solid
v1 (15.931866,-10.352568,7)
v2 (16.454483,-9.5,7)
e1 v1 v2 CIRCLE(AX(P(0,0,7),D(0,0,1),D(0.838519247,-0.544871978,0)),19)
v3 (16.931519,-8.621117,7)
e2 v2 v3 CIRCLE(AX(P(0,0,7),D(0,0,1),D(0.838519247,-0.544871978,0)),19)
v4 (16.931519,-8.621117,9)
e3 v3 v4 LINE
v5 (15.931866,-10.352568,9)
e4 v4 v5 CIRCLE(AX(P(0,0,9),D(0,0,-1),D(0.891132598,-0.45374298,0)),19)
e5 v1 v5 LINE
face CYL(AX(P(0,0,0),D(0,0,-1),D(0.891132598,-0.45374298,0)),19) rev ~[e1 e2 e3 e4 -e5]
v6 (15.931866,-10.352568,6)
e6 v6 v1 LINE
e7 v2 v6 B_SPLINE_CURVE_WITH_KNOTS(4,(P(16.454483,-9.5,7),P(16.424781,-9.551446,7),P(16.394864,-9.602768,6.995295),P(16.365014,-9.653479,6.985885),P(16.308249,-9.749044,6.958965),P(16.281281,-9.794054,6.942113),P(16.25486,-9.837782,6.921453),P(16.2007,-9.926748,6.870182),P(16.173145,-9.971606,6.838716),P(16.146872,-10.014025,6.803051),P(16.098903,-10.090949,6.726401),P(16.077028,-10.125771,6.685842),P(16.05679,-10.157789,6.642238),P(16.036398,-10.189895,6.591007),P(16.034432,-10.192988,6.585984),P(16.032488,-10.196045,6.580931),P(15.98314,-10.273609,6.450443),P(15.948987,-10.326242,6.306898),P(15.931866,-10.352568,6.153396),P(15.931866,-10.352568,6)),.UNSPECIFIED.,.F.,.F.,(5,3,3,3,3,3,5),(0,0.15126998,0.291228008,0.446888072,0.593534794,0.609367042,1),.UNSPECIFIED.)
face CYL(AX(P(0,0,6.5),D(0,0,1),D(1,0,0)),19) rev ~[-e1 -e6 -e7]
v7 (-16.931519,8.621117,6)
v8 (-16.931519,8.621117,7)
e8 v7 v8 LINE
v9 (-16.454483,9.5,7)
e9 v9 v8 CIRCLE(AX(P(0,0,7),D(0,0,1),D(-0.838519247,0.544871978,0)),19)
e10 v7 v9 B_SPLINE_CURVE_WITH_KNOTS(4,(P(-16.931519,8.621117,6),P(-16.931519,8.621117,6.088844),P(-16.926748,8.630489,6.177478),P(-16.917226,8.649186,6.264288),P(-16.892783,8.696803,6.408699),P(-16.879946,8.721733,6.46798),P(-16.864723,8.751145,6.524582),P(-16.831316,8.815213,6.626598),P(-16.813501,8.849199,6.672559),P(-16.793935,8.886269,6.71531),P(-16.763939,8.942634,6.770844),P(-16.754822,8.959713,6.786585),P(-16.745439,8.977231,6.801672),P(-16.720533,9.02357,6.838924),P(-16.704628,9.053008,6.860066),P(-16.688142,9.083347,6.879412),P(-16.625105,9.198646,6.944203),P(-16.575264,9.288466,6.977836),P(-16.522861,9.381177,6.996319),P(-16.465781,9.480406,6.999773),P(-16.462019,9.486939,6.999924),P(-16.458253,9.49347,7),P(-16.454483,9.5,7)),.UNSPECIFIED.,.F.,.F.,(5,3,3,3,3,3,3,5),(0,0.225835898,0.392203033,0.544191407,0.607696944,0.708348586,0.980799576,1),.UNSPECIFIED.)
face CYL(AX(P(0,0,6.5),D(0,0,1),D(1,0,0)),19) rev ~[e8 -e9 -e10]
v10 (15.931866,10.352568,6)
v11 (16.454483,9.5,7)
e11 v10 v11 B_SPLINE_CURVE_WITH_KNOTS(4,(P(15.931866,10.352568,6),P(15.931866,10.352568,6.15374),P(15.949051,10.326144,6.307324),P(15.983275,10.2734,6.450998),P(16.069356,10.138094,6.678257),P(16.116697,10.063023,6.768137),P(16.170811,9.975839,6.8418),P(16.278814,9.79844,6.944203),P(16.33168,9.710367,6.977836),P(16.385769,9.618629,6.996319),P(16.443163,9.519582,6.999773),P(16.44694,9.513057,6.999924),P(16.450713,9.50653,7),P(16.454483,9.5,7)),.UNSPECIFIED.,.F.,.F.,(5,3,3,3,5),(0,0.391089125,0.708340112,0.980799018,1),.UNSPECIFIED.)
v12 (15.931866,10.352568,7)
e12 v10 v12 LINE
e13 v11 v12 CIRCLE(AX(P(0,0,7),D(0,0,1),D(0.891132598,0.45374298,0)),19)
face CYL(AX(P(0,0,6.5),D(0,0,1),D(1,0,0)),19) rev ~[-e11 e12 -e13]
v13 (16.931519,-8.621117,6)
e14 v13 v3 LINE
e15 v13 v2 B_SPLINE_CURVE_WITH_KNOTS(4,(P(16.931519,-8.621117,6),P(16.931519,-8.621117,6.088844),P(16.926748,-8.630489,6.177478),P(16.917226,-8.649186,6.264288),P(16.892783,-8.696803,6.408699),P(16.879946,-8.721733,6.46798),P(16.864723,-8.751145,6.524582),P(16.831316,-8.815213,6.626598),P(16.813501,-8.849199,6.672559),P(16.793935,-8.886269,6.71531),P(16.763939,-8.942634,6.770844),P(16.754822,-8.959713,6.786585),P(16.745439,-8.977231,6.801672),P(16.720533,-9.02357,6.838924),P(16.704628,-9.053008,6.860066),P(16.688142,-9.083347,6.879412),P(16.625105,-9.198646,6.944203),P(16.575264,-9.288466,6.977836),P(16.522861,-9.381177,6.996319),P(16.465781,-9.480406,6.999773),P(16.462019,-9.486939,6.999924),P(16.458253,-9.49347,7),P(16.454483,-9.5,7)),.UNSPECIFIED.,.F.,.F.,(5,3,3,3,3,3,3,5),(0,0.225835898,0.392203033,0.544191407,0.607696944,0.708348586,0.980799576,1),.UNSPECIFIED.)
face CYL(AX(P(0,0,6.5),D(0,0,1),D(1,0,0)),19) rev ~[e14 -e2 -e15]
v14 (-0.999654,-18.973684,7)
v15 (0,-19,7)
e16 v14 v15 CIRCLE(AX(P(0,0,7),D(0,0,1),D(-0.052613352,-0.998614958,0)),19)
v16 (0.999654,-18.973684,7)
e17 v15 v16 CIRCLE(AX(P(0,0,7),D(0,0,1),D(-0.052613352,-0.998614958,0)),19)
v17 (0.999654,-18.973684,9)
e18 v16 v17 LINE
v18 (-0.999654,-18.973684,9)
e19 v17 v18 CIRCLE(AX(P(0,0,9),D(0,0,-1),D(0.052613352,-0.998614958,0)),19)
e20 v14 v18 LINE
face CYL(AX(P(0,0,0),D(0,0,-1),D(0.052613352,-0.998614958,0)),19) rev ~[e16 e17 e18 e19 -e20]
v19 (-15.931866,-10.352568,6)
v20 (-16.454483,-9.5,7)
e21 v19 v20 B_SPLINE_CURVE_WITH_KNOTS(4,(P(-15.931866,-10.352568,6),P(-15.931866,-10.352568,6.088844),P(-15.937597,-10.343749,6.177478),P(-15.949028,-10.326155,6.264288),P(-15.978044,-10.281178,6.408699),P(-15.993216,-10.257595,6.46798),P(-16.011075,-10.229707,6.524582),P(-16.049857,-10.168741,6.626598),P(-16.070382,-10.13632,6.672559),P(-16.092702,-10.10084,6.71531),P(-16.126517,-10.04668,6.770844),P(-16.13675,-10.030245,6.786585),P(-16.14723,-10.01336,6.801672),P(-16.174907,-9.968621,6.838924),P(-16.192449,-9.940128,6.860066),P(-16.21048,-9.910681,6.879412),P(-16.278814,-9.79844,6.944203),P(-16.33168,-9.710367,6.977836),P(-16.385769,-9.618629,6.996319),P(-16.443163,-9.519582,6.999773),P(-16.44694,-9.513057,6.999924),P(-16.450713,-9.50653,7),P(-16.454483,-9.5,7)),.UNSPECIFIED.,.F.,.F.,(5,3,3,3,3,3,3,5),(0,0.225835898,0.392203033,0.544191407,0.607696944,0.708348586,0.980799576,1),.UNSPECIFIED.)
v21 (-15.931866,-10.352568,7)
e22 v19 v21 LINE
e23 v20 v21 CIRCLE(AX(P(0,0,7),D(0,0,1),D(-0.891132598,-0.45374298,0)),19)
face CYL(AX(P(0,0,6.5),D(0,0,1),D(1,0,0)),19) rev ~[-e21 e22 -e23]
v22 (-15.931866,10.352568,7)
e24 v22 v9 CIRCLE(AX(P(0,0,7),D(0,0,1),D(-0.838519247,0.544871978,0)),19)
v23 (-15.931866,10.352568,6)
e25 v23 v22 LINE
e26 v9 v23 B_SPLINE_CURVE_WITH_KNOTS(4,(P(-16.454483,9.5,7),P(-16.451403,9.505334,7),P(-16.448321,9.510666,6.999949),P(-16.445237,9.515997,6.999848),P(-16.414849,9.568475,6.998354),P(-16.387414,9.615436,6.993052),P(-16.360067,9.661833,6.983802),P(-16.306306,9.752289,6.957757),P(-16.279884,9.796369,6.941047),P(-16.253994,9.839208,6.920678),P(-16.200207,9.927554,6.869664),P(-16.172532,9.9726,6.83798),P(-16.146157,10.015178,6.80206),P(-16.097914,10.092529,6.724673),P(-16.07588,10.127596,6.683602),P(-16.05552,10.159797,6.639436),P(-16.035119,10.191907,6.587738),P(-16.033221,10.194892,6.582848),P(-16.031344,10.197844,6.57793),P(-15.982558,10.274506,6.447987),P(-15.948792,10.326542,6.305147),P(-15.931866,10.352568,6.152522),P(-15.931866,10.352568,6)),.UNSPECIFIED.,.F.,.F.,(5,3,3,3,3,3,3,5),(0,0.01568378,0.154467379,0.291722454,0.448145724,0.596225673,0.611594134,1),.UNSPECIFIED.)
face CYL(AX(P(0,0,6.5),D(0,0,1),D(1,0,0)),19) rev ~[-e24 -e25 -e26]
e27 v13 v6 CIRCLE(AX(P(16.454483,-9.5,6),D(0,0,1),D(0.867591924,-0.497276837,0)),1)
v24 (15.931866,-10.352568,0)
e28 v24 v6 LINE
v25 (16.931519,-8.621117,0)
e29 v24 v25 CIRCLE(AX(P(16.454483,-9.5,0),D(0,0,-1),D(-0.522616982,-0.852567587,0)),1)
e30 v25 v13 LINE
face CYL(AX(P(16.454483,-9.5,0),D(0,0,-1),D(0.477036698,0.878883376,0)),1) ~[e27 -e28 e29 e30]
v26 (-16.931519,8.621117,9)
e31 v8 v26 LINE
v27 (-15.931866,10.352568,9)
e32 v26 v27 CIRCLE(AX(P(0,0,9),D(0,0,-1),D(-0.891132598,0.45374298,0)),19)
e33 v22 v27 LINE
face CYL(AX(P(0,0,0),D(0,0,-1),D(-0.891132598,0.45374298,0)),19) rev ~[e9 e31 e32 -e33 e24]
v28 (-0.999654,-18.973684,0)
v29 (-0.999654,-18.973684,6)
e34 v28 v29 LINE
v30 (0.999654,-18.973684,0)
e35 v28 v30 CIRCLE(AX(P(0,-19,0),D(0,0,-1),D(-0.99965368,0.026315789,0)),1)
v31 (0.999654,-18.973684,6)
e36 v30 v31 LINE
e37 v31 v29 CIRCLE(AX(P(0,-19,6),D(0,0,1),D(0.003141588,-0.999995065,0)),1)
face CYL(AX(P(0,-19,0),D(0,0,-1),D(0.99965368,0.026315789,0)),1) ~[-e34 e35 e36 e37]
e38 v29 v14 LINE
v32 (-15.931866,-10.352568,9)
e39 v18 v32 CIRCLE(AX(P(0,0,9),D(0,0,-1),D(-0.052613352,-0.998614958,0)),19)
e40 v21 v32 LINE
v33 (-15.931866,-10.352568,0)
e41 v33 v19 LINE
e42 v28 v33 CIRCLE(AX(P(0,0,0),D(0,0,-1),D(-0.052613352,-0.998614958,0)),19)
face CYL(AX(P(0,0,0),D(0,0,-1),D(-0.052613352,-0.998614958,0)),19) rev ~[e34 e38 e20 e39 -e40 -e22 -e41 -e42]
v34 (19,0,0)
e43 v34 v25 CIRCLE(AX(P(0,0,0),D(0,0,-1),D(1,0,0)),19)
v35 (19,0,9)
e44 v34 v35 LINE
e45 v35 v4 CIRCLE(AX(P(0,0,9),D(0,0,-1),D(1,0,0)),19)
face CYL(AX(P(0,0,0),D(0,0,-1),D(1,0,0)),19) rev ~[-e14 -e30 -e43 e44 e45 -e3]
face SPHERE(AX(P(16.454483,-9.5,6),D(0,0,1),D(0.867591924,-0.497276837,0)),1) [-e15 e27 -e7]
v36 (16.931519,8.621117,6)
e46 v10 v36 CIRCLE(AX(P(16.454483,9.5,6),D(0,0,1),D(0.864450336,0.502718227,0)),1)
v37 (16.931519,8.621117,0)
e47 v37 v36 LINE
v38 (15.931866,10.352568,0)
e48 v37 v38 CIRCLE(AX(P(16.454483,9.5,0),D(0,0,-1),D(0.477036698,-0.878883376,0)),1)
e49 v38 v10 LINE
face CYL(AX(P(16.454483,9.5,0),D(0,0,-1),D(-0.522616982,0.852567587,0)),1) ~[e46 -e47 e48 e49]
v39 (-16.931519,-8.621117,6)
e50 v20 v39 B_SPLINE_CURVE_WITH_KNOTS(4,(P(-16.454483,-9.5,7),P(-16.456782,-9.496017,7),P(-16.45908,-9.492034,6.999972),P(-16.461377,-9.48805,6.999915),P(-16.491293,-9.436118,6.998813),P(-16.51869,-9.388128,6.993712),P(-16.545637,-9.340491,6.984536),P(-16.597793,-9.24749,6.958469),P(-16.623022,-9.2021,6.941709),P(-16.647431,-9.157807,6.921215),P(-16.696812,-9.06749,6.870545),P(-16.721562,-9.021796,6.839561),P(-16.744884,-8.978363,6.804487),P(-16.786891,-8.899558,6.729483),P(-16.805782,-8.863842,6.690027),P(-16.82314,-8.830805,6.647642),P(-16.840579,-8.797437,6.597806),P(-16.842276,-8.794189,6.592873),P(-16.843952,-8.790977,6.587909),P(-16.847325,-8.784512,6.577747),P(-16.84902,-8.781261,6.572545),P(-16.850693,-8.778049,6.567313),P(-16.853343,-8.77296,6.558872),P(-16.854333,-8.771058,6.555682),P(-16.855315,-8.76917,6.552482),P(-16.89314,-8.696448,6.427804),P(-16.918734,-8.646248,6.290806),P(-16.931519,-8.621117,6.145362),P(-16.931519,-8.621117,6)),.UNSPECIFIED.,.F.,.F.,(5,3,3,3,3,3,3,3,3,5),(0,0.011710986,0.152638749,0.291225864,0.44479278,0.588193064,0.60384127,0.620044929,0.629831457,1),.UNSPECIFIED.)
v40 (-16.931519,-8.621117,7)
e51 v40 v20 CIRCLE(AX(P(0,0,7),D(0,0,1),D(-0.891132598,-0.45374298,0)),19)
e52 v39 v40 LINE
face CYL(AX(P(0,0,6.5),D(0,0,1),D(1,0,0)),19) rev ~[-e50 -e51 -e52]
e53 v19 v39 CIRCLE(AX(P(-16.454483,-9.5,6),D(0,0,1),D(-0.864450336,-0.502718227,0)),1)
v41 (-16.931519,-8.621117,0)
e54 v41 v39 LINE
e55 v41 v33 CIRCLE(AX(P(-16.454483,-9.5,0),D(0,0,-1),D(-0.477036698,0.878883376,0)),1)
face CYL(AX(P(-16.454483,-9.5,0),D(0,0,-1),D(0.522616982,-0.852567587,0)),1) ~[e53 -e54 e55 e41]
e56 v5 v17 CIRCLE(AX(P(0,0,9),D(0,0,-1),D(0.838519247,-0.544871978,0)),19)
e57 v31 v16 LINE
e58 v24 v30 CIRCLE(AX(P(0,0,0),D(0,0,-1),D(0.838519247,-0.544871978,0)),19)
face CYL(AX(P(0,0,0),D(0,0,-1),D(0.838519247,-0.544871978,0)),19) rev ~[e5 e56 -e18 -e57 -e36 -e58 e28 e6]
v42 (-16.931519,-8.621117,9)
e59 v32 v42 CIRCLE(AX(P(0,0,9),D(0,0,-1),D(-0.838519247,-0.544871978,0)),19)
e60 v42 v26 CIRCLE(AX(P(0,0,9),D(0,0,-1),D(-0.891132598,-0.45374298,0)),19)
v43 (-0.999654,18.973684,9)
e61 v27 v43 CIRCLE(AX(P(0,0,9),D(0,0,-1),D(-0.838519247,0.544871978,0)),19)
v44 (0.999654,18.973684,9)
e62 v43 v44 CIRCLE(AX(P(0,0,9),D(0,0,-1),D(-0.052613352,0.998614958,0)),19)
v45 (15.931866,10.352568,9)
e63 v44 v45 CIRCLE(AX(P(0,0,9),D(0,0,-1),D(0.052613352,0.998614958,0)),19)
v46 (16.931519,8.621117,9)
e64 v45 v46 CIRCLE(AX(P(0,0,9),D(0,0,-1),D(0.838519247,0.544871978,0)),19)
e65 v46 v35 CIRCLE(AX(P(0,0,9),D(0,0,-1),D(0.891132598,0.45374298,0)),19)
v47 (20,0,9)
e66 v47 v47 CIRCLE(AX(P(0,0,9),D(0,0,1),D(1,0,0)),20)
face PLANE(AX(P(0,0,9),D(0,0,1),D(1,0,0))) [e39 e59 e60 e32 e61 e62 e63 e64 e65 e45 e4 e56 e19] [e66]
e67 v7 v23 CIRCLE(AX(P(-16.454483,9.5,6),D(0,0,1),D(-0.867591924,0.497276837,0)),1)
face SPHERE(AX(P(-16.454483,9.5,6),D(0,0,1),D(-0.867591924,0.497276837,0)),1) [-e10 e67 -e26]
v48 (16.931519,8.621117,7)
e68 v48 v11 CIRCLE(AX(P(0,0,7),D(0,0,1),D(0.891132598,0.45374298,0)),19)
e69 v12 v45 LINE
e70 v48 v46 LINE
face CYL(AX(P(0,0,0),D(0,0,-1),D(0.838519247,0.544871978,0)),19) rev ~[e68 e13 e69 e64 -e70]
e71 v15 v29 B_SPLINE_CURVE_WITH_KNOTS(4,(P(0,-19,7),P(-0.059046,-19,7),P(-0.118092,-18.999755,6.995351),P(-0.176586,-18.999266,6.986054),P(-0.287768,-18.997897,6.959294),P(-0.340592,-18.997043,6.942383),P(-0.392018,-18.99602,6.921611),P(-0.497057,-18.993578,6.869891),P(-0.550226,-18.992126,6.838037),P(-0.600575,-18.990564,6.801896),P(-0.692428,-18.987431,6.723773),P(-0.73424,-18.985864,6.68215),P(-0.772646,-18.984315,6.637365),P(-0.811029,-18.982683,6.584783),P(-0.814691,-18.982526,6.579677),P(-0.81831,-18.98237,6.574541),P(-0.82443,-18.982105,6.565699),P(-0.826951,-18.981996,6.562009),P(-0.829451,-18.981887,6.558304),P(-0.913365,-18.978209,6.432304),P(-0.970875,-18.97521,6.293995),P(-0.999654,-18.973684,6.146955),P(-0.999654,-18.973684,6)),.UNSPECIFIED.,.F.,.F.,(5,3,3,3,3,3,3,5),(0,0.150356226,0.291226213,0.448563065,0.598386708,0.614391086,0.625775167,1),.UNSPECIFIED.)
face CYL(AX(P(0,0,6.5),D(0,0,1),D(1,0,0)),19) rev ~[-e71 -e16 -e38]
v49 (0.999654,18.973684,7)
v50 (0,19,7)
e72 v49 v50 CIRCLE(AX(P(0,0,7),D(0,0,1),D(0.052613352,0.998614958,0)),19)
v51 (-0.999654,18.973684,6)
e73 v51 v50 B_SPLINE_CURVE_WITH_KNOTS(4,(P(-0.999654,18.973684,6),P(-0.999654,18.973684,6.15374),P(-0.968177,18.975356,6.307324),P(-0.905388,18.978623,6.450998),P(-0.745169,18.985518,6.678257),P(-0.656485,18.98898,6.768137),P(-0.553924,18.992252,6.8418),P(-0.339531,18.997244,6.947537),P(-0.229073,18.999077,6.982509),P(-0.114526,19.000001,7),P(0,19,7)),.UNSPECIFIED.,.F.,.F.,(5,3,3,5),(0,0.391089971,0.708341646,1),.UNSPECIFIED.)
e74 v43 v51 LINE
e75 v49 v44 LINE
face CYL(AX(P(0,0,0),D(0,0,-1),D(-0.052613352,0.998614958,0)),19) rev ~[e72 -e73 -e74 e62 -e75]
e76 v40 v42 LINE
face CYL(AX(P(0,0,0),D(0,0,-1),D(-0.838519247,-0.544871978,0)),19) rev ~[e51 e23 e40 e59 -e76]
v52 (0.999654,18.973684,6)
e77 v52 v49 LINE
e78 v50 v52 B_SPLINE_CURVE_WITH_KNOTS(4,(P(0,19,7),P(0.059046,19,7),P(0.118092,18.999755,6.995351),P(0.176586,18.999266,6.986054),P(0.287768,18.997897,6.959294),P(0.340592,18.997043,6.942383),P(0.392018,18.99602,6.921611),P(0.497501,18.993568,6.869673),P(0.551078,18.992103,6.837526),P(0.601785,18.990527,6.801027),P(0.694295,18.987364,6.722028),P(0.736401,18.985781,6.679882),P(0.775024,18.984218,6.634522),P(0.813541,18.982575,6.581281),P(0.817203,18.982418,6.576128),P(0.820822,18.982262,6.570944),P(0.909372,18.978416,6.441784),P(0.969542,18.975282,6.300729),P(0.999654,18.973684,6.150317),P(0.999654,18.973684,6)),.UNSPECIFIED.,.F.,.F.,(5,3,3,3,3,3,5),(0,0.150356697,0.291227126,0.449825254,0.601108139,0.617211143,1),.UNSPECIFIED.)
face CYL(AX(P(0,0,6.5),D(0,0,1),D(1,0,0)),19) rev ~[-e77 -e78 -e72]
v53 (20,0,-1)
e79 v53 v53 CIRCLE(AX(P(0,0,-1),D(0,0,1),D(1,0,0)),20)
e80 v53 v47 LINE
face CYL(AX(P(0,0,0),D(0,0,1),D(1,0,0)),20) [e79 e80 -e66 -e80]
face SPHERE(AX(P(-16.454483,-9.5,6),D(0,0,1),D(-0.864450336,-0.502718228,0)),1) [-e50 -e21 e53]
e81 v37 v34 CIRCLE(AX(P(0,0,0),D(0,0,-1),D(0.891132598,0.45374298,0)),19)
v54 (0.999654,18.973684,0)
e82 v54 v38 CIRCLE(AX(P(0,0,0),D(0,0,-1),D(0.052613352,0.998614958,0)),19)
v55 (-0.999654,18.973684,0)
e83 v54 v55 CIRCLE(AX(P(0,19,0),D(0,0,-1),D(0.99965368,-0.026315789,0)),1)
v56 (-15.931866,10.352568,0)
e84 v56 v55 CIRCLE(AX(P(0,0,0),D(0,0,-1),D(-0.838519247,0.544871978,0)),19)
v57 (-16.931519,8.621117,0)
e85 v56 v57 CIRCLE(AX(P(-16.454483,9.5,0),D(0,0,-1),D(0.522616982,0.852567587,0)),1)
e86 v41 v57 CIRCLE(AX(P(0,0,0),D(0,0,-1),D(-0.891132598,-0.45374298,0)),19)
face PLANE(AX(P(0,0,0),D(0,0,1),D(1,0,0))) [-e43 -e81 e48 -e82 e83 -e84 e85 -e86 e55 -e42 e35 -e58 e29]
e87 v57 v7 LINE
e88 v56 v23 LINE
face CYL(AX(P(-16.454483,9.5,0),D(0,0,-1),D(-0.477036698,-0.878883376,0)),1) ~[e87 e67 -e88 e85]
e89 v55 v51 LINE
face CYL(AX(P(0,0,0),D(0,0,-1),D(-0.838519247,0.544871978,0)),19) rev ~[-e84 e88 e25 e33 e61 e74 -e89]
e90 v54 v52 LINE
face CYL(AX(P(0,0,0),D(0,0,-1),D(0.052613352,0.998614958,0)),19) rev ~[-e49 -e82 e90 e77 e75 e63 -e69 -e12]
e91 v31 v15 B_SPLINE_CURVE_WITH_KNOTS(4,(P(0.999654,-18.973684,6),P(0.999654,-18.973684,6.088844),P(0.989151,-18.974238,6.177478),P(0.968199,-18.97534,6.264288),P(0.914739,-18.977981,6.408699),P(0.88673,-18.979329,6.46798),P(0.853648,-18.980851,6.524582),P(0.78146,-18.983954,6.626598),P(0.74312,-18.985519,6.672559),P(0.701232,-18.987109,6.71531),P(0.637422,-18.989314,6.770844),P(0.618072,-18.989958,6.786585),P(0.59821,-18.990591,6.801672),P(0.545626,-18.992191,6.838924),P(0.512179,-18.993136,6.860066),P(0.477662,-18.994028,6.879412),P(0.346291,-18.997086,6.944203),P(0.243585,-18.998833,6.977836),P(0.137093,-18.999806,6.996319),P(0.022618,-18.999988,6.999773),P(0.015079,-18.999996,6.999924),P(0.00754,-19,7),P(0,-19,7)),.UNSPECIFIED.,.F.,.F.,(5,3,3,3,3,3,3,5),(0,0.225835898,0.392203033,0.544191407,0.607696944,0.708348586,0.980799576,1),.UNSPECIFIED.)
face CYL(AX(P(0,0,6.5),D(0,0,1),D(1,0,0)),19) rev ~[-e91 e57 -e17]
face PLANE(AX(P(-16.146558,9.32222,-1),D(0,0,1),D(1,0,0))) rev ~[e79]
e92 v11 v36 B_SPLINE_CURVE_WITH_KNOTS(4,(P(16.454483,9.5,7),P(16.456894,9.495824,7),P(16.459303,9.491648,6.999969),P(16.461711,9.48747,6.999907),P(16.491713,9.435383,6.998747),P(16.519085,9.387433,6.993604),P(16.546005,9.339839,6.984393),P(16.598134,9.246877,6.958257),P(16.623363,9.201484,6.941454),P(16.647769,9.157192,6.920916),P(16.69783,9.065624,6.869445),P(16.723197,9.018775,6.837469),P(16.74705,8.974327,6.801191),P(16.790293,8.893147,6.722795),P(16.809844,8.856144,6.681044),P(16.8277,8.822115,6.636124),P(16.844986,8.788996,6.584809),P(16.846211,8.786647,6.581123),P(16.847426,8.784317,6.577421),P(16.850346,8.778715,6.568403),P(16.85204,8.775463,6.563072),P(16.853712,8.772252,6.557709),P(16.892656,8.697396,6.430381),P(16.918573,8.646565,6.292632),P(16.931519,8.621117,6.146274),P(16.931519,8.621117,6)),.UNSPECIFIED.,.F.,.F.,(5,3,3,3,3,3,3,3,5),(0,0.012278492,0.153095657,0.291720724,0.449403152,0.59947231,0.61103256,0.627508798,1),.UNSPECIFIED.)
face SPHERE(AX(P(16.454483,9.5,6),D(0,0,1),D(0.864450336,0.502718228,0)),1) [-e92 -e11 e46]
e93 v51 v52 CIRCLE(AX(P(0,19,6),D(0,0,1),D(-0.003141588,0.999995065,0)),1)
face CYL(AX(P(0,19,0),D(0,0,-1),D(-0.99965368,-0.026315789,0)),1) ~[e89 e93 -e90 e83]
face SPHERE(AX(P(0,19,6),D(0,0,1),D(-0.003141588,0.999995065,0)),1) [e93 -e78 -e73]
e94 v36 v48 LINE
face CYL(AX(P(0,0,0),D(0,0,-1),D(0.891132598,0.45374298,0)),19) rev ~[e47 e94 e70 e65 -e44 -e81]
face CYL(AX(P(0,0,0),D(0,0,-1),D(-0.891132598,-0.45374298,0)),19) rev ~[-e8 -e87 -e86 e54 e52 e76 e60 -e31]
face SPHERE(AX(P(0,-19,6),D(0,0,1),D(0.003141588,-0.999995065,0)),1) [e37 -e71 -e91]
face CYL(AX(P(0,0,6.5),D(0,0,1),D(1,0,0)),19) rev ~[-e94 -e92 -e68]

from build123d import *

# Parameters (mm, degrees)
F0_R          = 20
F1_DEPTH      = 9
F2_DEPTH      = 1
F3_DEPTH      = 7
F3_DEPTH_BACK = 1
F4_T4_ANGLE   = 359.64
F4_S5_R       = 19
F4_T6_DEPTH   = 3
F4_T10_ANGLE  = 359.64
F4_S11_R      = 19
F4_T12_DEPTH  = 3
F4_T16_ANGLE  = 359.64
F4_S17_R      = 19
F4_T18_DEPTH  = 3
F4_T22_ANGLE  = 359.64
F4_S23_R      = 19
F4_T24_DEPTH  = 3
F4_T28_ANGLE  = 359.64
F4_S29_R      = 19
F4_T30_DEPTH  = 3
F4_T34_ANGLE  = 359.64
F4_S35_R      = 19
F4_T36_DEPTH  = 3


# Not quite as in the source:
# - a fillet or chamfer that OpenCascade refuses, or shapes differently, is made with other operations: its cross-section is extruded or revolved along the edge and cut away or added


with BuildPart() as f1:
    # F0 (on Top) → F1 (new body)
    with BuildSketch(Plane.XY):
        Circle(F0_R)
        with BuildLine():
            ThreePointArc((16.9315193695, 8.6211166237), (18.4756443463, 4.432895892), (19, 0))
            ThreePointArc((19, 0), (18.4756443463, -4.432895892), (16.9315193695, -8.6211166237))
            ThreePointArc((16.9315193695, -8.6211166237), (16.4544826719, -9.5), (15.9318656899, -10.3525675868))
            ThreePointArc((15.9318656899, -10.3525675868), (9.5, -16.4544826719), (0.9996536796, -18.9736842105))
            ThreePointArc((0.9996536796, -18.9736842105), (0, -19), (-0.9996536796, -18.9736842105))
            ThreePointArc((-0.9996536796, -18.9736842105), (-9.5, -16.4544826719), (-15.9318656899, -10.3525675868))
            ThreePointArc((-15.9318656899, -10.3525675868), (-16.4544826719, -9.5), (-16.9315193695, -8.6211166237))
            ThreePointArc((-16.9315193695, -8.6211166237), (-19, 0), (-16.9315193695, 8.6211166237))
            ThreePointArc((-16.9315193695, 8.6211166237), (-16.4544826719, 9.5), (-15.9318656899, 10.3525675868))
            ThreePointArc((-15.9318656899, 10.3525675868), (-9.5, 16.4544826719), (-0.9996536796, 18.9736842105))
            ThreePointArc((-0.9996536796, 18.9736842105), (0, 19), (0.9996536796, 18.9736842105))
            ThreePointArc((0.9996536796, 18.9736842105), (9.5, 16.4544826719), (15.9318656899, 10.3525675868))
            ThreePointArc((15.9318656899, 10.3525675868), (16.4544826719, 9.5), (16.9315193695, 8.6211166237))
        make_face(mode=Mode.SUBTRACT)
    extrude(amount=F1_DEPTH)

    # F0 (on Top) → F2 (join)
    with BuildSketch(Plane.XY):
        Circle(F0_R)
        with BuildLine():
            ThreePointArc((16.9315193695, 8.6211166237), (18.4756443463, 4.432895892), (19, 0))
            ThreePointArc((19, 0), (18.4756443463, -4.432895892), (16.9315193695, -8.6211166237))
            ThreePointArc((16.9315193695, -8.6211166237), (16.4544826719, -9.5), (15.9318656899, -10.3525675868))
            ThreePointArc((15.9318656899, -10.3525675868), (9.5, -16.4544826719), (0.9996536796, -18.9736842105))
            ThreePointArc((0.9996536796, -18.9736842105), (0, -19), (-0.9996536796, -18.9736842105))
            ThreePointArc((-0.9996536796, -18.9736842105), (-9.5, -16.4544826719), (-15.9318656899, -10.3525675868))
            ThreePointArc((-15.9318656899, -10.3525675868), (-16.4544826719, -9.5), (-16.9315193695, -8.6211166237))
            ThreePointArc((-16.9315193695, -8.6211166237), (-19, 0), (-16.9315193695, 8.6211166237))
            ThreePointArc((-16.9315193695, 8.6211166237), (-16.4544826719, 9.5), (-15.9318656899, 10.3525675868))
            ThreePointArc((-15.9318656899, 10.3525675868), (-9.5, 16.4544826719), (-0.9996536796, 18.9736842105))
            ThreePointArc((-0.9996536796, 18.9736842105), (0, 19), (0.9996536796, 18.9736842105))
            ThreePointArc((0.9996536796, 18.9736842105), (9.5, 16.4544826719), (15.9318656899, 10.3525675868))
            ThreePointArc((15.9318656899, 10.3525675868), (16.4544826719, 9.5), (16.9315193695, 8.6211166237))
        make_face(mode=Mode.SUBTRACT)
        with BuildLine():
            ThreePointArc((16.9315193695, -8.6211166237), (18.4756443463, -4.432895892), (19, 0))
            ThreePointArc((19, 0), (18.4756443463, 4.432895892), (16.9315193695, 8.6211166237))
            ThreePointArc((16.9315193695, 8.6211166237), (15.5884572681, 9), (15.9318656899, 10.3525675868))
            ThreePointArc((15.9318656899, 10.3525675868), (9.5, 16.4544826719), (0.9996536796, 18.9736842105))
            ThreePointArc((0.9996536796, 18.9736842105), (0, 18), (-0.9996536796, 18.9736842105))
            ThreePointArc((-0.9996536796, 18.9736842105), (-9.5, 16.4544826719), (-15.9318656899, 10.3525675868))
            ThreePointArc((-15.9318656899, 10.3525675868), (-15.5884572681, 9), (-16.9315193695, 8.6211166237))
            ThreePointArc((-16.9315193695, 8.6211166237), (-19, 0), (-16.9315193695, -8.6211166237))
            ThreePointArc((-16.9315193695, -8.6211166237), (-15.5884572681, -9), (-15.9318656899, -10.3525675868))
            ThreePointArc((-15.9318656899, -10.3525675868), (-9.5, -16.4544826719), (-0.9996536796, -18.9736842105))
            ThreePointArc((-0.9996536796, -18.9736842105), (0, -18), (0.9996536796, -18.9736842105))
            ThreePointArc((0.9996536796, -18.9736842105), (9.5, -16.4544826719), (15.9318656899, -10.3525675868))
            ThreePointArc((15.9318656899, -10.3525675868), (15.5884572681, -9), (16.9315193695, -8.6211166237))
        make_face()
    extrude(amount=-F2_DEPTH)

    # F0 (on Top) → F3 (join, two sides)
    with BuildSketch(Plane.XY) as f3_sk:
        with BuildLine():
            ThreePointArc((-16.9315193695, 8.6211166237), (-15.5884572681, 9), (-15.9318656899, 10.3525675868))
            ThreePointArc((-15.9318656899, 10.3525675868), (-16.4544826719, 9.5), (-16.9315193695, 8.6211166237))
        make_face()
        with BuildLine():
            ThreePointArc((-0.9996536796, 18.9736842105), (0, 18), (0.9996536796, 18.9736842105))
            ThreePointArc((0.9996536796, 18.9736842105), (0, 19), (-0.9996536796, 18.9736842105))
        make_face()
        with BuildLine():
            ThreePointArc((15.9318656899, 10.3525675868), (15.5884572681, 9), (16.9315193695, 8.6211166237))
            ThreePointArc((16.9315193695, 8.6211166237), (16.4544826719, 9.5), (15.9318656899, 10.3525675868))
        make_face()
        with BuildLine():
            ThreePointArc((15.9318656899, -10.3525675868), (16.4544826719, -9.5), (16.9315193695, -8.6211166237))
            ThreePointArc((16.9315193695, -8.6211166237), (15.5884572681, -9), (15.9318656899, -10.3525675868))
        make_face()
        with BuildLine():
            ThreePointArc((-0.9996536796, -18.9736842105), (0, -19), (0.9996536796, -18.9736842105))
            ThreePointArc((0.9996536796, -18.9736842105), (0, -18), (-0.9996536796, -18.9736842105))
        make_face()
        with BuildLine():
            ThreePointArc((-16.9315193695, -8.6211166237), (-16.4544826719, -9.5), (-15.9318656899, -10.3525675868))
            ThreePointArc((-15.9318656899, -10.3525675868), (-15.5884572681, -9), (-16.9315193695, -8.6211166237))
        make_face()
    extrude(amount=F3_DEPTH)
    extrude(f3_sk.sketch, amount=-F3_DEPTH_BACK)

    # F4: fillet of radius 1 on 6 edges, made by hand


with BuildPart() as f4_tool2:
    # F4_s3 → F4_t4 (revolve)
    with BuildSketch(Plane(origin=(0.0300073325, -0.0515991808, 0), x_dir=(0, 0, 1), z_dir=(0.5027182272, -0.8644503364, 0))):
        with BuildLine():
            ThreePointArc((6, -19.9999062388), (6.7071067812, -19.70701302), (7, -18.9999062388))
            Line((7, -18.9999062388), (7, -19.9999062388))
            Line((7, -19.9999062388), (6, -19.9999062388))
        make_face()
    revolve(axis=Axis((16.4544826719, 9.5, 7), (0, 0, 1)), revolution_arc=F4_T4_ANGLE)

    # F4_s5 → F4_t6 (intersect, symmetric)
    with BuildSketch(Plane.XY.offset(6.5)):
        Circle(F4_S5_R)
    extrude(amount=F4_T6_DEPTH, both=True, mode=Mode.INTERSECT)


with BuildPart() as f1_1:
    add(f1.part)

    # F4_t1: cut F4_tool2
    add(f4_tool2.part, mode=Mode.SUBTRACT)


with BuildPart() as f4_tool8:
    # F4_s9 → F4_t10 (revolve)
    with BuildSketch(Plane(origin=(-0.0296825351, -0.0517867027, 0), x_dir=(0, 0, 1), z_dir=(-0.497276838, -0.8675919239, 0))):
        with BuildLine():
            ThreePointArc((6, -19.9999062388), (6.7071067812, -19.70701302), (7, -18.9999062388))
            Line((7, -18.9999062388), (7, -19.9999062388))
            Line((7, -19.9999062388), (6, -19.9999062388))
        make_face()
    revolve(axis=Axis((16.4544826719, -9.5, 7), (0, 0, 1)), revolution_arc=F4_T10_ANGLE)

    # F4_s11 → F4_t12 (intersect, symmetric)
    with BuildSketch(Plane.XY.offset(6.5)):
        Circle(F4_S11_R)
    extrude(amount=F4_T12_DEPTH, both=True, mode=Mode.INTERSECT)


with BuildPart() as f1_2:
    add(f1_1.part)

    # F4_t7: cut F4_tool8
    add(f4_tool8.part, mode=Mode.SUBTRACT)


with BuildPart() as f4_tool14:
    # F4_s15 → F4_t16 (revolve)
    with BuildSketch(Plane(origin=(-0.0596898677, -0.0001875219, 0), x_dir=(0, 0, 1), z_dir=(-0.9999950652, -0.0031415875, 0))):
        with BuildLine():
            ThreePointArc((6, -19.9999062388), (6.7071067812, -19.70701302), (7, -18.9999062388))
            Line((7, -18.9999062388), (7, -19.9999062388))
            Line((7, -19.9999062388), (6, -19.9999062388))
        make_face()
    revolve(axis=Axis((0, -19, 7), (0, 0, 1)), revolution_arc=F4_T16_ANGLE)

    # F4_s17 → F4_t18 (intersect, symmetric)
    with BuildSketch(Plane.XY.offset(6.5)):
        Circle(F4_S17_R)
    extrude(amount=F4_T18_DEPTH, both=True, mode=Mode.INTERSECT)


with BuildPart() as f1_3:
    add(f1_2.part)

    # F4_t13: cut F4_tool14
    add(f4_tool14.part, mode=Mode.SUBTRACT)


with BuildPart() as f4_tool20:
    # F4_s21 → F4_t22 (revolve)
    with BuildSketch(Plane(origin=(-0.0300073325, 0.0515991808, 0), x_dir=(0, 0, 1), z_dir=(-0.5027182272, 0.8644503364, 0))):
        with BuildLine():
            ThreePointArc((6, -19.9999062388), (6.7071067812, -19.70701302), (7, -18.9999062388))
            Line((7, -18.9999062388), (7, -19.9999062388))
            Line((7, -19.9999062388), (6, -19.9999062388))
        make_face()
    revolve(axis=Axis((-16.4544826719, -9.5, 7), (0, 0, 1)), revolution_arc=F4_T22_ANGLE)

    # F4_s23 → F4_t24 (intersect, symmetric)
    with BuildSketch(Plane.XY.offset(6.5)):
        Circle(F4_S23_R)
    extrude(amount=F4_T24_DEPTH, both=True, mode=Mode.INTERSECT)


with BuildPart() as f1_4:
    add(f1_3.part)

    # F4_t19: cut F4_tool20
    add(f4_tool20.part, mode=Mode.SUBTRACT)


with BuildPart() as f4_tool26:
    # F4_s27 → F4_t28 (revolve)
    with BuildSketch(Plane(origin=(0.0296825351, 0.0517867027, 0), x_dir=(0, 0, 1), z_dir=(0.497276838, 0.8675919239, 0))):
        with BuildLine():
            ThreePointArc((6, -19.9999062388), (6.7071067812, -19.70701302), (7, -18.9999062388))
            Line((7, -18.9999062388), (7, -19.9999062388))
            Line((7, -19.9999062388), (6, -19.9999062388))
        make_face()
    revolve(axis=Axis((-16.4544826719, 9.5, 7), (0, 0, 1)), revolution_arc=F4_T28_ANGLE)

    # F4_s29 → F4_t30 (intersect, symmetric)
    with BuildSketch(Plane.XY.offset(6.5)):
        Circle(F4_S29_R)
    extrude(amount=F4_T30_DEPTH, both=True, mode=Mode.INTERSECT)


with BuildPart() as f1_5:
    add(f1_4.part)

    # F4_t25: cut F4_tool26
    add(f4_tool26.part, mode=Mode.SUBTRACT)


with BuildPart() as f4_tool32:
    # F4_s33 → F4_t34 (revolve)
    with BuildSketch(Plane(origin=(0.0596898677, 0.0001875219, 0), x_dir=(0, 0, 1), z_dir=(0.9999950652, 0.0031415875, 0))):
        with BuildLine():
            ThreePointArc((6, -19.9999062388), (6.7071067812, -19.70701302), (7, -18.9999062388))
            Line((7, -18.9999062388), (7, -19.9999062388))
            Line((7, -19.9999062388), (6, -19.9999062388))
        make_face()
    revolve(axis=Axis((0, 19, 7), (0, 0, 1)), revolution_arc=F4_T34_ANGLE)

    # F4_s35 → F4_t36 (intersect, symmetric)
    with BuildSketch(Plane.XY.offset(6.5)):
        Circle(F4_S35_R)
    extrude(amount=F4_T36_DEPTH, both=True, mode=Mode.INTERSECT)


with BuildPart() as f1_6:
    add(f1_5.part)

    # F4_t31: cut F4_tool32
    add(f4_tool32.part, mode=Mode.SUBTRACT)


solid = f1_6.part
